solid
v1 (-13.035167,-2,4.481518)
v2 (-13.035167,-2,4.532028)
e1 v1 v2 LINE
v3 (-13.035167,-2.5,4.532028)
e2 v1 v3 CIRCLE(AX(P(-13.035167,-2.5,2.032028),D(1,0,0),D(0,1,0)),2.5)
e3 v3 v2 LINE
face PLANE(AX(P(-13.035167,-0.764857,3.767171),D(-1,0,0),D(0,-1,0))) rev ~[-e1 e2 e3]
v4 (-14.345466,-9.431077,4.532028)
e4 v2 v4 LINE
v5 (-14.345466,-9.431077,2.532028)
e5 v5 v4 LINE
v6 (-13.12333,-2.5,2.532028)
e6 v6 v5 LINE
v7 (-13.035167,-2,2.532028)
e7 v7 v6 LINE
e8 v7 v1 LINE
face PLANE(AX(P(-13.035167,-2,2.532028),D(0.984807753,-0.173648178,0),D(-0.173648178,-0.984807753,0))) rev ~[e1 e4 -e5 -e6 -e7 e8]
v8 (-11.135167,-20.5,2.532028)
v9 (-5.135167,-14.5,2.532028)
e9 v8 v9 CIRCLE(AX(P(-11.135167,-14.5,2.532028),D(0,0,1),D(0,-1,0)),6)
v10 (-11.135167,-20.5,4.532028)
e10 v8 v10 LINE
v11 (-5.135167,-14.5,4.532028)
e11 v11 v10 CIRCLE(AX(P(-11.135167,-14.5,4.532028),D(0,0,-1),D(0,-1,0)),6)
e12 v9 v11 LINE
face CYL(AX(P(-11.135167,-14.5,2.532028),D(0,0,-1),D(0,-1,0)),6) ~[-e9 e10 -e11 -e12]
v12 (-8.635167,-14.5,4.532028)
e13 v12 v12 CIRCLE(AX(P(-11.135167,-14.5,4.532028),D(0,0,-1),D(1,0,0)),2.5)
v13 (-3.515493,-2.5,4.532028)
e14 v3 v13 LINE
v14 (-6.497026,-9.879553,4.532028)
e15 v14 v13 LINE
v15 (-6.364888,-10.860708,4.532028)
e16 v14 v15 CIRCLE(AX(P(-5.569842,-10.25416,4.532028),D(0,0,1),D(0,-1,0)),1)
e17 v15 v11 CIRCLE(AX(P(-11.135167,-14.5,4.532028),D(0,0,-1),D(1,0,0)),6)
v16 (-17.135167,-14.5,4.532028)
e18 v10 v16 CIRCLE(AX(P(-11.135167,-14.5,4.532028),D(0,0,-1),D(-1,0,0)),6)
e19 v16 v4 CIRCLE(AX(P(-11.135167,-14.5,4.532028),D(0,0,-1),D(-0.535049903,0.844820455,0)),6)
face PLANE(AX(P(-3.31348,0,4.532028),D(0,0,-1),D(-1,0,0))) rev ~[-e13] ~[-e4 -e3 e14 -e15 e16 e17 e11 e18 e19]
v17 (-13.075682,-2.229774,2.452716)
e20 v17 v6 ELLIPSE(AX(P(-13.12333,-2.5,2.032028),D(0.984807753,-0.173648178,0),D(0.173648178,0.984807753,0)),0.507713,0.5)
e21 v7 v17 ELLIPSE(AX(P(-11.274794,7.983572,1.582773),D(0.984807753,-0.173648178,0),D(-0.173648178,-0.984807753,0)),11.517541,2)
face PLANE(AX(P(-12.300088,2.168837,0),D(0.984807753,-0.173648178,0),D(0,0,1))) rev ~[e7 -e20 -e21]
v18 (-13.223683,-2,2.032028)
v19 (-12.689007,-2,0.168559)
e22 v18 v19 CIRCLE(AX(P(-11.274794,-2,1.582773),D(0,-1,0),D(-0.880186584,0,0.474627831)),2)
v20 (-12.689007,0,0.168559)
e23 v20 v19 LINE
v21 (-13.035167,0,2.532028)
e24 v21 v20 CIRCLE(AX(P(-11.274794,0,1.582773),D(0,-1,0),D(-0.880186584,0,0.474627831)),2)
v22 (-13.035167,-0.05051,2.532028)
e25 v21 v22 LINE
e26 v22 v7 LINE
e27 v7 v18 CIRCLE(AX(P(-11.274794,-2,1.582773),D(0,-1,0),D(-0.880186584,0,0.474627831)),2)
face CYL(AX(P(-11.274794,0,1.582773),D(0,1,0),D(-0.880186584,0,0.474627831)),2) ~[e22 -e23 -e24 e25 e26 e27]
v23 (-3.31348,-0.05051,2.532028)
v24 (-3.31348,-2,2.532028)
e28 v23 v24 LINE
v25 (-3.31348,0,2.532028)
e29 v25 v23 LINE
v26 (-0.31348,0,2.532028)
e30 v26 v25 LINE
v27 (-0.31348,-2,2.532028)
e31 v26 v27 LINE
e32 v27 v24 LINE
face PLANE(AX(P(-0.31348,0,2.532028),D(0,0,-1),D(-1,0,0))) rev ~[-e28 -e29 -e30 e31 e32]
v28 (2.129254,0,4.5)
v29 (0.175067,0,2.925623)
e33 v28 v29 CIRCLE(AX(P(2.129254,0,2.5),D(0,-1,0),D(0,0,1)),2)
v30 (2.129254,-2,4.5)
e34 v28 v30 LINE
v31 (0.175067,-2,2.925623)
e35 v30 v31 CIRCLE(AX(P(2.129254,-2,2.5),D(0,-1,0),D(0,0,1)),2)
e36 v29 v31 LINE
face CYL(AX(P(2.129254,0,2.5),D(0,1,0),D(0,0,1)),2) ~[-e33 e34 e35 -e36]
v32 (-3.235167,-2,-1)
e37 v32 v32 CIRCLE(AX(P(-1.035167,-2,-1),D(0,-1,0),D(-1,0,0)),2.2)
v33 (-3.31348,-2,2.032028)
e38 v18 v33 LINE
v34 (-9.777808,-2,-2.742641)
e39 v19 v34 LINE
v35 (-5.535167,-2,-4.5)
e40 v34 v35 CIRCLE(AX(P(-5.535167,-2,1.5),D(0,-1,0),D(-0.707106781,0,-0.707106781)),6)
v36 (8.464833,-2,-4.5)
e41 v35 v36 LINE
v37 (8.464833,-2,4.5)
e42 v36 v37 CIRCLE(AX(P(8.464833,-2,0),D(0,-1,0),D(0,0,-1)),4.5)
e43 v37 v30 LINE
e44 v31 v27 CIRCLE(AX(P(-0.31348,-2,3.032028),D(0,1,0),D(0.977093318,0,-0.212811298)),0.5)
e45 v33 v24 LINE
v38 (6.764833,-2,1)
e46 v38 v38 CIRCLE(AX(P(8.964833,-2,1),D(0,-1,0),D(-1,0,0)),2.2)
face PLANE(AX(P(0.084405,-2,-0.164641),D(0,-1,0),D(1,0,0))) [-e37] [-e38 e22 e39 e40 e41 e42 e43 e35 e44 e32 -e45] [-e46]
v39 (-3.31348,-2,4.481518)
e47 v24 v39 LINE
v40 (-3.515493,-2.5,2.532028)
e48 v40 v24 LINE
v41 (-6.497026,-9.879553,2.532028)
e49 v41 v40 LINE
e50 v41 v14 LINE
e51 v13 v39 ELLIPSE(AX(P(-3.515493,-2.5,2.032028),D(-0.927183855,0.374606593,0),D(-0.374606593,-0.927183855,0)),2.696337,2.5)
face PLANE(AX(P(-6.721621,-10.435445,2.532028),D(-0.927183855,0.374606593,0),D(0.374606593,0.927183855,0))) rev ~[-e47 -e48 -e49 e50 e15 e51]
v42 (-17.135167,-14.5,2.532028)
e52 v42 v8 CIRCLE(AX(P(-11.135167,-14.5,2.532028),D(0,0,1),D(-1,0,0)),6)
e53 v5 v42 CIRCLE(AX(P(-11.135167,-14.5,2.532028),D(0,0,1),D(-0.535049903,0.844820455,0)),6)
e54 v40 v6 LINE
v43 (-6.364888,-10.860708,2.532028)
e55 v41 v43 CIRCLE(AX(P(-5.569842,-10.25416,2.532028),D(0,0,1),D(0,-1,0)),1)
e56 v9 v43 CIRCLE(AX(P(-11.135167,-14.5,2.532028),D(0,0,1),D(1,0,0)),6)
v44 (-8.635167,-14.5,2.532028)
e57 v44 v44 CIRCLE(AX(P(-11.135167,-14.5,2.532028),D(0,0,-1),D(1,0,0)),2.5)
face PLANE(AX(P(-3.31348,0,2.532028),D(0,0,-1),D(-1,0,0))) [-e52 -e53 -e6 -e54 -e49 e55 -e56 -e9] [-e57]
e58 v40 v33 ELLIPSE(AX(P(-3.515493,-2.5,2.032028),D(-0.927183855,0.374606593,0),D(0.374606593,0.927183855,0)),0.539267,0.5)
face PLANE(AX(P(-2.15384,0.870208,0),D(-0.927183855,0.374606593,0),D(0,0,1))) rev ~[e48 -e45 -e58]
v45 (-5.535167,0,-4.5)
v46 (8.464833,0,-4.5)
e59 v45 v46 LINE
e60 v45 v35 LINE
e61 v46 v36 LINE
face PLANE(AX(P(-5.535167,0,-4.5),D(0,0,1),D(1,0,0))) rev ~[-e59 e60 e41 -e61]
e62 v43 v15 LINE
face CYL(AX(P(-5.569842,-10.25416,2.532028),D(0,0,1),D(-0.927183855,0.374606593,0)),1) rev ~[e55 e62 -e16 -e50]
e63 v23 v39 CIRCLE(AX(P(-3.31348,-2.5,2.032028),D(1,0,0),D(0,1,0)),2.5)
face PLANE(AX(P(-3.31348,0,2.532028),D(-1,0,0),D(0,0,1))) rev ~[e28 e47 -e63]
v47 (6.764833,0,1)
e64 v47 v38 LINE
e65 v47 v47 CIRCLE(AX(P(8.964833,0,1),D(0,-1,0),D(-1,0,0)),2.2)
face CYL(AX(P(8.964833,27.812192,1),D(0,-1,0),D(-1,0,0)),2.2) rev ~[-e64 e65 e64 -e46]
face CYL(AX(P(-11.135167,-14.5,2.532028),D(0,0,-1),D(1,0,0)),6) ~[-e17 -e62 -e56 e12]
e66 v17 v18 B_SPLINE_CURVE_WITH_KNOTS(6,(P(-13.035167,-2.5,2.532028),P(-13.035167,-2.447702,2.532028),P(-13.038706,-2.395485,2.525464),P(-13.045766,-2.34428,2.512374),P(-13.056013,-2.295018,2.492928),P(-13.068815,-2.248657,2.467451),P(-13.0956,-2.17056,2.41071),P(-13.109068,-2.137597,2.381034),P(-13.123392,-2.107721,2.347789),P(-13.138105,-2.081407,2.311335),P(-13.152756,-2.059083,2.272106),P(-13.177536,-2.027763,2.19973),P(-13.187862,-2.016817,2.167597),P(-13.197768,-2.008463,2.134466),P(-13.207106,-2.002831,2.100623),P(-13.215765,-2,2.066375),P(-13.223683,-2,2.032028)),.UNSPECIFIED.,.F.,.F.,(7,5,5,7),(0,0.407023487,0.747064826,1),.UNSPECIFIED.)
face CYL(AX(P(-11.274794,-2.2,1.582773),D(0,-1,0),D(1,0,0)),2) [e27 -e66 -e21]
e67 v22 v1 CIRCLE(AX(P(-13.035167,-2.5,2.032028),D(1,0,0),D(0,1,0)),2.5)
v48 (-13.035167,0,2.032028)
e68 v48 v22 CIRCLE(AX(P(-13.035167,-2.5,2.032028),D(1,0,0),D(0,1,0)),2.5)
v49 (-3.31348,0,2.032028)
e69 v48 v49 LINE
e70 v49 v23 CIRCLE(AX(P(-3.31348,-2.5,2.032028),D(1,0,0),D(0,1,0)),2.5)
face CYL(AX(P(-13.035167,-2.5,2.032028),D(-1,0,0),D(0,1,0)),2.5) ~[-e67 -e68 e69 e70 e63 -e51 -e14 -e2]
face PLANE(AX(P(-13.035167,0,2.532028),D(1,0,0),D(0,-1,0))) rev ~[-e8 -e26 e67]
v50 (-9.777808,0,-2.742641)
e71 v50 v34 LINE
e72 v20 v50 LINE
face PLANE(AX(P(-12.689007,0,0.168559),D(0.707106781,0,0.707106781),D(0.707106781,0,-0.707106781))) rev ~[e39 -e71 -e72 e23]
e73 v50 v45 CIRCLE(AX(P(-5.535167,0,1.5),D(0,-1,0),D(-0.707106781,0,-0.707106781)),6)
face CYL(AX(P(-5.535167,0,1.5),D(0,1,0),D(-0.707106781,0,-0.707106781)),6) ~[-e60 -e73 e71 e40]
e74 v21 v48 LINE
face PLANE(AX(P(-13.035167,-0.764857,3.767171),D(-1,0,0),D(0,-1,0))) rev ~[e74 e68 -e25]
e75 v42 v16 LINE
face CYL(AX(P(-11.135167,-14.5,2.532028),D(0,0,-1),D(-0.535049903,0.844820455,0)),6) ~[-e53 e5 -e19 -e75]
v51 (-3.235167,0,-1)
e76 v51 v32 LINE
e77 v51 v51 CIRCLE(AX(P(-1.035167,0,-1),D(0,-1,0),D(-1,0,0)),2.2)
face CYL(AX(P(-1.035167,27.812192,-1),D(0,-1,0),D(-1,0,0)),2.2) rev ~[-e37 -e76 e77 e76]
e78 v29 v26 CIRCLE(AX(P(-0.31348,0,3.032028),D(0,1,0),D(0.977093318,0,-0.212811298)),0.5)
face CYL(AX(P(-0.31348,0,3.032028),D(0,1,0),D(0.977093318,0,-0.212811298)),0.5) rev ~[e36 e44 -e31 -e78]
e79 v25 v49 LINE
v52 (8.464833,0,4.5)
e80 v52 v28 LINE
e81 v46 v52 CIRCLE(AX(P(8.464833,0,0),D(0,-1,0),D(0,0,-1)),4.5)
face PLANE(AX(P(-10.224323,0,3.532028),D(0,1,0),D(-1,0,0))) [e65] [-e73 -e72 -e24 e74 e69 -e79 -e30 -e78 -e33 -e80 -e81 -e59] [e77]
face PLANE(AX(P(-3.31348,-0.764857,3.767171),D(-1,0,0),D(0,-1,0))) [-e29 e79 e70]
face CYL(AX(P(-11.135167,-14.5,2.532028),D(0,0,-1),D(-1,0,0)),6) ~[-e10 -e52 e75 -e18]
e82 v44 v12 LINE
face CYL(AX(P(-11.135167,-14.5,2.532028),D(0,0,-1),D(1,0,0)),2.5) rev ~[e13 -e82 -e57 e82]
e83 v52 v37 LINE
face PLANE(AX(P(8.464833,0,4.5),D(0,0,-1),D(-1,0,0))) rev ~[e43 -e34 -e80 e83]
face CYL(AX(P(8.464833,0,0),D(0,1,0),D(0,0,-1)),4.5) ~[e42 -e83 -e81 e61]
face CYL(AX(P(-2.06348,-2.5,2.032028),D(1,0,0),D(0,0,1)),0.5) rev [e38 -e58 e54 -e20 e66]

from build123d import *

# Parameters (mm, degrees)
F1_DEPTH     = 2
F2_D         = 4.4
F3_W         = 13.8216872486
F3_H         = 2
F4_DEPTH     = 20.5
F5_R         = 2.5
F6_DEPTH     = 25
F7_R         = 1
F8_T4_DEPTH  = 12.2216872486
F8_T10_DEPTH = 12.2216872486
F8_S11_R     = 2
F8_T12_DEPTH = 8
F10_DEPTH    = 9.7216872486


# Not quite as in the source:
# - a fillet or chamfer that OpenCascade refuses, or shapes differently, is made with other operations: its cross-section is extruded or revolved along the edge and cut away or added


with BuildPart() as f1:
    # F0 (on Front) → F1 (new body)
    with BuildSketch(Plane.XZ):
        with BuildLine():
            Line((-5.5351668461, -4.5), (8.4648331539, -4.5))
            ThreePointArc((8.4648331539, -4.5), (12.9648331539, 0), (8.4648331539, 4.5))
            Line((8.4648331539, 4.5), (2.1292536968, 4.5))
            ThreePointArc((2.1292536968, 4.5), (0.8745117295, 4.0574410408), (0.1750670613, 2.9256225954))
            ThreePointArc((0.1750670613, 2.9256225954), (0.0002058943, 2.6426679841), (-0.3134795975, 2.5320282443))
            Line((-0.3134795975, 2.5320282443), (-13.0351668461, 2.5320282443))
            ThreePointArc((-13.0351668461, 2.5320282443), (-13.2536814771, 1.2929397336), (-12.6890072408, 0.1685590205))
            Line((-12.6890072408, 0.1685590205), (-9.7778075332, -2.7426406871))
            ThreePointArc((-9.7778075332, -2.7426406871), (-7.8312674403, -4.0432771951), (-5.5351668461, -4.5))
        make_face()
    extrude(amount=F1_DEPTH)

    # F2 (through all)
    with Locations(Plane(origin=(0, 0, 0), x_dir=(1, 0, 0), z_dir=(0, 1, 0))):
        with Locations((-1.0351668461, 1), (8.9648331539, -1)):
            Hole(F2_D / 2)

    # F3 (on face) → F4 (join)
    with BuildSketch(Plane(origin=(0, 0, 0), x_dir=(-1, 0, 0), z_dir=(0, 1, 0))):
        with Locations((10.2243232218, 3.5320282443)):
            Rectangle(F3_W, F3_H)
    extrude(amount=-F4_DEPTH)

    # F5 (on face) → F6 (cut)
    with BuildSketch(Plane(origin=(0, 0, 2.5320282443), x_dir=(1, 0, 0), z_dir=(0, 0, -1))):
        with BuildLine():
            Line((-6.7216205274, 10.43544481), (-3.3134795975, 2))
            Line((-3.3134795975, 2), (-3.3134795975, 20.5))
            Line((-3.3134795975, 20.5), (-11.1351668461, 20.5))
            ThreePointArc((-11.1351668461, 20.5), (-6.892526159, 18.7426406871), (-5.1351668461, 14.5))
            ThreePointArc((-5.1351668461, 14.5), (-5.5458342423, 12.3184040145), (-6.7216205274, 10.43544481))
        make_face()
        with BuildLine():
            Line((-17.1351668461, 20.5), (-17.1351668461, 14.5))
            ThreePointArc((-17.1351668461, 14.5), (-15.3778075332, 18.7426406871), (-11.1351668461, 20.5))
            Line((-11.1351668461, 20.5), (-17.1351668461, 20.5))
        make_face()
        with BuildLine():
            Line((-17.1351668461, 0), (-13.0351668461, 0))
            Line((-13.0351668461, 0), (-13.0351668461, 2))
            Line((-13.0351668461, 2), (-14.3454662645, 9.4310772699))
            ThreePointArc((-14.3454662645, 9.4310772699), (-16.3916769293, 11.6070600171), (-17.1351668461, 14.5))
            Line((-17.1351668461, 14.5), (-17.1351668461, 0))
        make_face()
        with Locations((-11.1351668461, 14.5)):
            Circle(F5_R)
    extrude(amount=-F6_DEPTH, mode=Mode.SUBTRACT)

    # F7
    f7_edges = [f1.edges().sort_by_distance(p)[0] for p in [
        (-6.721621, -10.435445, 3.532028),
    ]]
    fillet(f7_edges, radius=F7_R)

    # F8: fillet of radius 0.5 on 1 edges, made by hand


with BuildPart() as f8_tool2:
    # F8_s3 → F8_t4 (new body)
    with BuildSketch(Plane.YZ.offset(-2.0634795975)):
        with BuildLine():
            ThreePointArc((-2.5, 2.5320282443), (-2.1464466094, 2.3855816349), (-2, 2.0320282443))
            Line((-2, 2.0320282443), (-2, 2.5320282443))
            Line((-2, 2.5320282443), (-2.5, 2.5320282443))
        make_face()
    extrude(amount=-F8_T4_DEPTH)

    split(bisect_by=Plane(origin=(-2.1538403044, 0.8702079692, 0), x_dir=(0, 0, 1), z_dir=(-0.9271838546, 0.3746065934, 0)), keep=Keep.TOP)

    split(bisect_by=Plane(origin=(-12.3000883277, 2.1688374373, 0), x_dir=(0, 0, 1), z_dir=(0.984807753, -0.1736481777, 0)), keep=Keep.TOP)


with BuildPart() as f1_1:
    add(f1.part)

    # F8_t1: union F8_tool2
    add(f8_tool2.part)


with BuildPart() as f8_tool8:
    # F8_s9 → F8_t10 (new body)
    with BuildSketch(Plane.YZ.offset(-2.0634795975)):
        with BuildLine():
            ThreePointArc((-2.5, 2.5320282443), (-2.1464466094, 2.3855816349), (-2, 2.0320282443))
            Line((-2, 2.0320282443), (-2, 2.5320282443))
            Line((-2, 2.5320282443), (-2.5, 2.5320282443))
        make_face()
    extrude(amount=-F8_T10_DEPTH)

    # F8_s11 → F8_t12 (intersect, symmetric)
    with BuildSketch(Plane.XZ.offset(2.2)):
        with Locations((-11.2747936785, 1.5827725829)):
            Circle(F8_S11_R)
    extrude(amount=F8_T12_DEPTH, both=True, mode=Mode.INTERSECT)


with BuildPart() as f1_2:
    add(f1_1.part)

    # F8_t7: union F8_tool8
    add(f8_tool8.part)

    # F9 (on face) → F10 (cut, through all)
    with BuildSketch(Plane(origin=(-13.0351668461, 0, 0), x_dir=(0, -1, 0), z_dir=(-1, 0, 0))):
        with BuildLine():
            Line((2.5, 4.5320282443), (2, 4.5320282443))
            Line((2, 4.5320282443), (0, 4.5320282443))
            Line((0, 4.5320282443), (0, 2.5320282443))
            Line((0, 2.5320282443), (0, 2.0320282443))
            ThreePointArc((0, 2.0320282443), (0.732233047, 3.7997951973), (2.5, 4.5320282443))
        make_face()
    extrude(amount=-F10_DEPTH, mode=Mode.SUBTRACT)


solid = f1_2.part
